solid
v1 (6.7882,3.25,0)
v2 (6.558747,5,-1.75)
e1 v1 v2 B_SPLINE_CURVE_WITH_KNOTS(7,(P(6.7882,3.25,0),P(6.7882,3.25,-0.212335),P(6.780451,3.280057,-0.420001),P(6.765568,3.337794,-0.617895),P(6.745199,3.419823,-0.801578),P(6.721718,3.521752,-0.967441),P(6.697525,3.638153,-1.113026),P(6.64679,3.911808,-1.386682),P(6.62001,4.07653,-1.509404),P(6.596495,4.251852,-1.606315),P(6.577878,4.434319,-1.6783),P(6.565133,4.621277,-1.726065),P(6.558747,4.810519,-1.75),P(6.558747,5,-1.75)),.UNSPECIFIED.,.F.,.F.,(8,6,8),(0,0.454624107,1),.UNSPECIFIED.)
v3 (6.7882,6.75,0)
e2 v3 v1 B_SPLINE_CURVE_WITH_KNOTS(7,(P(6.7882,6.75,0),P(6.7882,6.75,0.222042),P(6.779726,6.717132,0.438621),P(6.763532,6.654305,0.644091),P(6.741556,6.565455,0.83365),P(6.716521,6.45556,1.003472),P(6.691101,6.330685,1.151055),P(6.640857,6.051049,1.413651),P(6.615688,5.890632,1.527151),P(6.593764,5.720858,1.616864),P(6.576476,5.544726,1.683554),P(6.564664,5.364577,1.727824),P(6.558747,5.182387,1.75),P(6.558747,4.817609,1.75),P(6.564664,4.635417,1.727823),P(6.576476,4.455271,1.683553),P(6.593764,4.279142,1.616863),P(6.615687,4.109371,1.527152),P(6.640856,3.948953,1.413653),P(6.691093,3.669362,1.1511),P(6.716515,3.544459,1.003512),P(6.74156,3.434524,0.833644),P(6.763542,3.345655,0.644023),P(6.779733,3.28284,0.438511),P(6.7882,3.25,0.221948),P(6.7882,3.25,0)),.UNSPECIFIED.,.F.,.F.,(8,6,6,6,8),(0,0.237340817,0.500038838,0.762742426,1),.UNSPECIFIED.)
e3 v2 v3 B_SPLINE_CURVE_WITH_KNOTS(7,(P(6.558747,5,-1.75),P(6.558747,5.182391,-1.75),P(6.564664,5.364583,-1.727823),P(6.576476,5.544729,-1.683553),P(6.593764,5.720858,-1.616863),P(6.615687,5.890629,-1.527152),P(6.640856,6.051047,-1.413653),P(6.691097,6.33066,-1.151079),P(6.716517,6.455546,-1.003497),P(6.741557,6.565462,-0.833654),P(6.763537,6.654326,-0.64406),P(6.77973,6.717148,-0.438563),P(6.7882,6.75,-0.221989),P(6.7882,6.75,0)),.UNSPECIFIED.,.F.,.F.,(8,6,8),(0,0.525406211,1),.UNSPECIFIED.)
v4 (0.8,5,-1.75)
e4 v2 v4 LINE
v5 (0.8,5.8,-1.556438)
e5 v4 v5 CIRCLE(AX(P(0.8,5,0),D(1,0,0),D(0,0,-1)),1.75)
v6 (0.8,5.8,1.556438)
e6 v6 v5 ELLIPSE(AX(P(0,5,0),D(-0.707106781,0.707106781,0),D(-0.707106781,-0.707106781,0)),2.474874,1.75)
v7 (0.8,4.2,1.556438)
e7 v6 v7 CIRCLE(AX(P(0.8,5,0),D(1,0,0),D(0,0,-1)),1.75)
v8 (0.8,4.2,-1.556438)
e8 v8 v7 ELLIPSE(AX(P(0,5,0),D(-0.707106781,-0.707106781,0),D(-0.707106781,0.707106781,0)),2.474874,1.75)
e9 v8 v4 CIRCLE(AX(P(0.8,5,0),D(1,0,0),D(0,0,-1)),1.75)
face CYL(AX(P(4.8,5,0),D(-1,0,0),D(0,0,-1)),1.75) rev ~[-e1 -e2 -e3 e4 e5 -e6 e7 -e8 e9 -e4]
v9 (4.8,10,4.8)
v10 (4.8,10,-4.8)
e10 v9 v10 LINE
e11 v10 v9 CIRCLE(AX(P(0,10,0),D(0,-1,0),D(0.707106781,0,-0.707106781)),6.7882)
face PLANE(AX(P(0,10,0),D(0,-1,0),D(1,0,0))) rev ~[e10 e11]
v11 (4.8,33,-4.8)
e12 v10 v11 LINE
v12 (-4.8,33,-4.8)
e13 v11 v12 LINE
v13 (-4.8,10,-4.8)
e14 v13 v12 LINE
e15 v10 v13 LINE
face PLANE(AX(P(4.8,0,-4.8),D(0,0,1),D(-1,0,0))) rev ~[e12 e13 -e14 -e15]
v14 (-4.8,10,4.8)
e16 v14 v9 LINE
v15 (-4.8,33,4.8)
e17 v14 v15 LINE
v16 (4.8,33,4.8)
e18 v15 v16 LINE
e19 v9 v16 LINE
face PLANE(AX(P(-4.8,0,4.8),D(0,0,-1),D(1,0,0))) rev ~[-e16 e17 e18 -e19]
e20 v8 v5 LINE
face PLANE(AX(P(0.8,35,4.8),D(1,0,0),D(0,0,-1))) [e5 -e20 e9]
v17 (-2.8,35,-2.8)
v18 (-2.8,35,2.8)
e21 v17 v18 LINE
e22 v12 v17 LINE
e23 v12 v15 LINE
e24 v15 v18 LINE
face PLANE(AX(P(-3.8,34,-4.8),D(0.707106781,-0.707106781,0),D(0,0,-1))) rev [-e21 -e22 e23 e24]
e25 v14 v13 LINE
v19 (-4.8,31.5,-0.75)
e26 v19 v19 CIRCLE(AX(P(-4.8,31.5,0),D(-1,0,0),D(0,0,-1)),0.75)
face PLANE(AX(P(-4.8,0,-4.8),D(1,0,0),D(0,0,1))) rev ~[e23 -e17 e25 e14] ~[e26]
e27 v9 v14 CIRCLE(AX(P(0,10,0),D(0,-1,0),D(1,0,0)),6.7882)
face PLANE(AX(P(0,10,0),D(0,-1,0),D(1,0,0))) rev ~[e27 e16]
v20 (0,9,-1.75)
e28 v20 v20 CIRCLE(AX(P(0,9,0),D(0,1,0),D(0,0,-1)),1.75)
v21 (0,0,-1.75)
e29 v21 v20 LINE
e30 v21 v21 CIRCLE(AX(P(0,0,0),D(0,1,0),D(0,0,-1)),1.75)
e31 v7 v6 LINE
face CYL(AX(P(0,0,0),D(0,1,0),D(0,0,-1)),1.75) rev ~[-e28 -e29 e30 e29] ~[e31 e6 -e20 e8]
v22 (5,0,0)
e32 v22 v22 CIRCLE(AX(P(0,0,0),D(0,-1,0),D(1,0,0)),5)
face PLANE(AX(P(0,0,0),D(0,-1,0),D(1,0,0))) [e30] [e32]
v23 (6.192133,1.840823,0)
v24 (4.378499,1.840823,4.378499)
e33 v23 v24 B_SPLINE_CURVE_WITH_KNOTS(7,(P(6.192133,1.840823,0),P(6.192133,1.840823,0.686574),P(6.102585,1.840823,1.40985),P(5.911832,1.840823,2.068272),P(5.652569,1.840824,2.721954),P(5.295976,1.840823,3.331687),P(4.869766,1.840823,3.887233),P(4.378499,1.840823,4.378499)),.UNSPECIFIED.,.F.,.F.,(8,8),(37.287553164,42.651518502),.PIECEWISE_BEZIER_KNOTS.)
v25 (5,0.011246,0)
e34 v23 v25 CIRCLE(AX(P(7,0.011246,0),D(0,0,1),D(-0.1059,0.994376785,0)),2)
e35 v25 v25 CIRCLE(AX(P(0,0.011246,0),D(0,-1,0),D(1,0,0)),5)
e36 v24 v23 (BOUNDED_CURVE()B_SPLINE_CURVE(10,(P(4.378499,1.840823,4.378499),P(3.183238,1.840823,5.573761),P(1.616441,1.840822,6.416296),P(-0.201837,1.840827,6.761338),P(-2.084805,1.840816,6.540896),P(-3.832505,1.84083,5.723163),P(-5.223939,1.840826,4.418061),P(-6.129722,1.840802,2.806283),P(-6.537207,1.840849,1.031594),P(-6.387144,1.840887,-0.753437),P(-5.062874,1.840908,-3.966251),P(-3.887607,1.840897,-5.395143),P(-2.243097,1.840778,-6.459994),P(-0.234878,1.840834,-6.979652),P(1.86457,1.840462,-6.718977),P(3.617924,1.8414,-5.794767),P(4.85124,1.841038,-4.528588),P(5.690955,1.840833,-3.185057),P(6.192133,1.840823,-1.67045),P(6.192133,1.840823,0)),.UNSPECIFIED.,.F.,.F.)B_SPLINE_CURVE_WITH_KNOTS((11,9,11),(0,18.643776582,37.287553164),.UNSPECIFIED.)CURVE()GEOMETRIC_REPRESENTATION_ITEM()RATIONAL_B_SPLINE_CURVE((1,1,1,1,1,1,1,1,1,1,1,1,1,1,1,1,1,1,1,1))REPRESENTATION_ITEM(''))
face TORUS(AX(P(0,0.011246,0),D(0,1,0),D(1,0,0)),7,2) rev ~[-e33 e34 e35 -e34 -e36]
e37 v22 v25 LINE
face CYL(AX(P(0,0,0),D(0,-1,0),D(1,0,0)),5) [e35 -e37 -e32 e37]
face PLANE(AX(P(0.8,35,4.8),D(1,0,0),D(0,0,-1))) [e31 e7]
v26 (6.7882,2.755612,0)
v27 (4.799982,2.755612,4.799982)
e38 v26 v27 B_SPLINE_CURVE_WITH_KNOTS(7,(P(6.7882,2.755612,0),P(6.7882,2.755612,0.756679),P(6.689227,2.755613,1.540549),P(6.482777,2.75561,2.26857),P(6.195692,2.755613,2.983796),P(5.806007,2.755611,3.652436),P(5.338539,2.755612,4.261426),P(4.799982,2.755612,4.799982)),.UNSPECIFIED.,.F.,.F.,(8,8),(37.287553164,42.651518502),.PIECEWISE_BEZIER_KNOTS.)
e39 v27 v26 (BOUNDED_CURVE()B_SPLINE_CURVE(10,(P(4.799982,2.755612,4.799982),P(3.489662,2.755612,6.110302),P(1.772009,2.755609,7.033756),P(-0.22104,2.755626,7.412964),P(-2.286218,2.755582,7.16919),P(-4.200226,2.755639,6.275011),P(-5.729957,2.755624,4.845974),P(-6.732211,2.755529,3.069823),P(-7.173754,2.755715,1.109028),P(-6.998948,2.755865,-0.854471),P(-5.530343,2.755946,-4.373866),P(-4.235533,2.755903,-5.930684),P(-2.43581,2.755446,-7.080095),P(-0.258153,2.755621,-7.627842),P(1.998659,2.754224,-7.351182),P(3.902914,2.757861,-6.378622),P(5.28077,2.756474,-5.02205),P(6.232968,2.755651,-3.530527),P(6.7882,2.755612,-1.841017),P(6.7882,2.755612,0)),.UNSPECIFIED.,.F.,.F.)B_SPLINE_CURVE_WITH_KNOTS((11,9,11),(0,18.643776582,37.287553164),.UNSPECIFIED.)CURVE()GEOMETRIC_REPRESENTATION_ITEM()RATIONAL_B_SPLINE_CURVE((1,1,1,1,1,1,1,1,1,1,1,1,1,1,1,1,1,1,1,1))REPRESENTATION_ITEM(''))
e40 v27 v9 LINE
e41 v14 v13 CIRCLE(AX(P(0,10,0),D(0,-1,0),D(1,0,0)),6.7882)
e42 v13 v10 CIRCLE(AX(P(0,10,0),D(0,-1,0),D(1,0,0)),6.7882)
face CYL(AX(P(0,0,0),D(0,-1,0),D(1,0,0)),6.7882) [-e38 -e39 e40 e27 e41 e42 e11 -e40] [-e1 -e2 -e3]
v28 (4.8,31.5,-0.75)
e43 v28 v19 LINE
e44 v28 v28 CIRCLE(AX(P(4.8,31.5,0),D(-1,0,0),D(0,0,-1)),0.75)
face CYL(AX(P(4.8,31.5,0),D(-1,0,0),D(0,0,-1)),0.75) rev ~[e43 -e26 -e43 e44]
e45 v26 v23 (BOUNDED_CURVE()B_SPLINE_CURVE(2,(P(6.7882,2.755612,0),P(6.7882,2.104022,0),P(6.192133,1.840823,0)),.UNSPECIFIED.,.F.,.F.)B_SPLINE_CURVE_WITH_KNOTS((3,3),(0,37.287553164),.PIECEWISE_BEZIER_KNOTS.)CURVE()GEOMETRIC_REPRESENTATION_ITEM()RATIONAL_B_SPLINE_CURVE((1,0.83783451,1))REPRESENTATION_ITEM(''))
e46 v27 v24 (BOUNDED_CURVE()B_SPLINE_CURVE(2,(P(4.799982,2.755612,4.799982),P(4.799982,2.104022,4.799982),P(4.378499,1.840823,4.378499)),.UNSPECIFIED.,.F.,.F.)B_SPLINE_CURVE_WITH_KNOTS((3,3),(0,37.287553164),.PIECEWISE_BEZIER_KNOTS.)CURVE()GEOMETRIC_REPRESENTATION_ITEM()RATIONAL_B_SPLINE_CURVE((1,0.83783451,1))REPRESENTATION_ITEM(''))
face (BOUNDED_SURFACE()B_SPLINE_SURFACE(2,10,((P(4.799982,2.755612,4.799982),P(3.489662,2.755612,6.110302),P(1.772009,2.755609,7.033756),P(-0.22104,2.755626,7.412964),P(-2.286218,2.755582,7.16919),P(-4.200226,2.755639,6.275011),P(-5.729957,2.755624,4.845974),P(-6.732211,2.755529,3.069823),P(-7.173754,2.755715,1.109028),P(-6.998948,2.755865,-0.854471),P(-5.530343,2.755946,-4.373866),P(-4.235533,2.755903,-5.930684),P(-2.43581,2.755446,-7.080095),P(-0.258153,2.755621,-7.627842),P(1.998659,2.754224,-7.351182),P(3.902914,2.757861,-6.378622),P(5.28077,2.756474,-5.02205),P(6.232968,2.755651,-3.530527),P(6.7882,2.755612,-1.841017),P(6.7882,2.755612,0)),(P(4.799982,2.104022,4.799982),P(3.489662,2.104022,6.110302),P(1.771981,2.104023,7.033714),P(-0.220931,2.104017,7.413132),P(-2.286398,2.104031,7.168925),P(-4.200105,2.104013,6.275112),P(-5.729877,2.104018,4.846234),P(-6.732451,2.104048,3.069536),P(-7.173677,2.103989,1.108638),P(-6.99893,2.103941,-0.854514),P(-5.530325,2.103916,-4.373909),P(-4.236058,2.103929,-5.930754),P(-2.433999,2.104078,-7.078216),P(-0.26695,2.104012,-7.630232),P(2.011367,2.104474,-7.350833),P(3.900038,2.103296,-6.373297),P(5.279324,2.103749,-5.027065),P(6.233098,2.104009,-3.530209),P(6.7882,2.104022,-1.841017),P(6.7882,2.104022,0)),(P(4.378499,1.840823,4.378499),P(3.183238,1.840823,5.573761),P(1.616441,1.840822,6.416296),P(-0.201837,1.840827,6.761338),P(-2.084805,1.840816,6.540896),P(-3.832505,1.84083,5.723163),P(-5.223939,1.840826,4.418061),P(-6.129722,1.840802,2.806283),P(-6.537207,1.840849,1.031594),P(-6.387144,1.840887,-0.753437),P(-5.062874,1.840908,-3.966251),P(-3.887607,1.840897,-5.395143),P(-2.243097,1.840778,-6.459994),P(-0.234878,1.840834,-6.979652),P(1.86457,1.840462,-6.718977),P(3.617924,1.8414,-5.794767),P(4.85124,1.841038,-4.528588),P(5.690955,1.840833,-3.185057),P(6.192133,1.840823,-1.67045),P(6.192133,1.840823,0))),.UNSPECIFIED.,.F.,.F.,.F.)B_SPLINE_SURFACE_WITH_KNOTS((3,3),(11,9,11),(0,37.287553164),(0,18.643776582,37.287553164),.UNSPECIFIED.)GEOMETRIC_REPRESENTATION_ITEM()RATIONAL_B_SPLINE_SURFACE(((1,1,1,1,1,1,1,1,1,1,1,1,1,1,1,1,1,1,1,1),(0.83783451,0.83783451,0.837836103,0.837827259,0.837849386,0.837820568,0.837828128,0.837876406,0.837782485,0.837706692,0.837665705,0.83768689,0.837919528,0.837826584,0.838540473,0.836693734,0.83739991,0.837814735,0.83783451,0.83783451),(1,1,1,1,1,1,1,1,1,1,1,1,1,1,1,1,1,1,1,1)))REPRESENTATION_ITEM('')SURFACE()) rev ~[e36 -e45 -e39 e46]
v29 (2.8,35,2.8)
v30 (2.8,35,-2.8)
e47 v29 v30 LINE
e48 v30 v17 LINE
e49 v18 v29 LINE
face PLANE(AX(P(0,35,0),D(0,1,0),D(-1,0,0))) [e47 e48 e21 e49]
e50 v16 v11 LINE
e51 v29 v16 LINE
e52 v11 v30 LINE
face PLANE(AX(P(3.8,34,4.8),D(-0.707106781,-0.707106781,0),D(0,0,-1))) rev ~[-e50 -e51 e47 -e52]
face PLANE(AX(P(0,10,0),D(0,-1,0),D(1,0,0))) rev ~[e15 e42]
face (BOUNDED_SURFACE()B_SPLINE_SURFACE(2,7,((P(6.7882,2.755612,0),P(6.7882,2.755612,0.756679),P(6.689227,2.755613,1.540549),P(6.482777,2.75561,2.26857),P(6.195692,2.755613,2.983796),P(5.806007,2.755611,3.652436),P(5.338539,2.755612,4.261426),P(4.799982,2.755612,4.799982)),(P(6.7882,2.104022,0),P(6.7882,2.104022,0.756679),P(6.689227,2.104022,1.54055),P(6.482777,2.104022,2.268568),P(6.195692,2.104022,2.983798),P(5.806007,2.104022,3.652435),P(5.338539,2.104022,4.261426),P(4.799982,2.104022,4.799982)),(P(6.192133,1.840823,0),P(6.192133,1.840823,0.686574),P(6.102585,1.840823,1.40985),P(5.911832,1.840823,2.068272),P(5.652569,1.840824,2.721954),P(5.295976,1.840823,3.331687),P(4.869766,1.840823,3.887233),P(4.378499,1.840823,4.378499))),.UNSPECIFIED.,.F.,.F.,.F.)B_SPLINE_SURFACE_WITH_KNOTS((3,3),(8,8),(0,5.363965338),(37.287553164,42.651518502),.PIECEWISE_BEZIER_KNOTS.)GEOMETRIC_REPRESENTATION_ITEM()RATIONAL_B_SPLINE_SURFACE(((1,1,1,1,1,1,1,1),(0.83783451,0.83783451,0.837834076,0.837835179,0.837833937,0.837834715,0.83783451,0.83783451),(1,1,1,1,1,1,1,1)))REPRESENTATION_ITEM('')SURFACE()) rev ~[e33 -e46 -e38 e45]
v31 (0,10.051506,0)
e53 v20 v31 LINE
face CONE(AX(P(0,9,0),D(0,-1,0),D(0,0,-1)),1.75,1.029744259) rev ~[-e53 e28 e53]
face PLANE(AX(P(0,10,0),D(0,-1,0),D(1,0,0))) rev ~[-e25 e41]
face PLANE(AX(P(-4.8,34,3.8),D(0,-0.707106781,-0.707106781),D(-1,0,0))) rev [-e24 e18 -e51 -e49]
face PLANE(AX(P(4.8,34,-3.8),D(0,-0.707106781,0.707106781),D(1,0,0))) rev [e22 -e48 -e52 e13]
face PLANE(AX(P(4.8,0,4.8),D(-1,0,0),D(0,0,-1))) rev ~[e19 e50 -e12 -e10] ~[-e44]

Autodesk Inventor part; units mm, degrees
ref_plane "YZ Plane" through (0, 0, 0) normal (1, 0, 0) x (0, 1, 0)
ref_plane "XZ Plane" through (0, 0, 0) normal (0, 1, 0) x (-1, 0, 0)
ref_plane "XY Plane" through (0, 0, 0) normal (0, 0, 1) x (1, 0, 0)
sketch "Sketch1" plane through (0, 0, 0) normal (0, 1, 0) x (-1, 0, 0)
  line L0 (4.8, 4.8) -> (-4.8, 4.8)
  line L1 (-4.8, 4.8) -> (-4.8, -4.8)
  line L2 (-4.8, -4.8) -> (4.8, -4.8)
  line L3 (4.8, -4.8) -> (4.8, 4.8)
  point P0 (0, 0)
  point P1 (4.8, 0)
  point P2 (0, -4.8)
  dimension "d0" = 9.6
  dimension "d1" = 9.6
extrude "Extrusion1" add sketch "Sketch1" along normal blind 35
sketch "Sketch5" plane through (0, 0, 0) normal (0, -1, 0) x (1, 0, 0)
  circle A0 centre (0, 0) radius 1.75
  line L0 (4.8, 4.8) -> (4.8, -4.8) projected
  line L1 (-4.8, 4.8) -> (4.8, 4.8) projected
  line L2 (4.8, -4.8) -> (-4.8, -4.8) projected
  line L3 (4.8, 4.8) -> (-4.8, 4.8)
  line L4 (-4.8, 4.8) -> (-4.8, -4.8)
  line L5 (-4.8, -4.8) -> (4.8, -4.8)
  line L6 (4.8, -4.8) -> (4.8, 4.8)
  circle A1 centre (0, 0) radius 6.7882
  point P0 (-4.8, 4.8)
  point P1 (-4.8, 4.8)
  point P2 (-4.8, 4.8)
  dimension "d14" = 3.5
extrude "Extrusion5" add sketch "Sketch5" against normal blind 10 contours A1 L0 | L1 A1 | A1 L2 | L4 A1
sketch "Sketch6" plane through (4.8, 35, 4.8) normal (1, 0, 0) x (0, 0, -1)
  line L0 (0, 0) -> (9.6, 0) projected
  point P0 (4.8, -35)
  point P1 (4.8, -3.5)
  point P2 (4.8, 0)
  dimension "d18" = 3.5
hole "Hole1" at (4.8, 31.5, 0) direction (-1, 0, 0) diameter 1.5 end through all
sketch "Sketch9" plane through (4.8, 35, 4.8) normal (1, 0, 0) x (0, 0, -1)
  circle A0 centre (4.8, -30) radius 1.75
  point P0 (4.8, -35)
  dimension "d41" = 5
  dimension "d42" = 3.5
extrude "Extrusion7" cut sketch "Sketch9" along normal blind 5 and the other way blind 4
sketch "Sketch10" plane through (0, 0, 0) normal (0, -1, 0) x (1, 0, 0)
  point P0 (0, 0)
  point P1 (0, 0)
hole "Hole3" at (0, 0, 0) direction (0, 1, 0) diameter 3.5 depth 9 tip angle 118
sketch "Sketch11" plane through (0, 0, 0) normal (0, -1, 0) x (1, 0, 0)
  circle A0 centre (0, 0) radius 5
  circle A1 centre (0, 0) radius 7.5
  dimension "d55" = 10
  dimension "d63" = 15
extrude "Extrusion8" cut sketch "Sketch11" against normal blind 2
fillet "Fillet3" radius 2 1 edges at (-5, 2, 0)
chamfer "Chamfer1" distance 2 angle 45 4 edges at (-4.8, 35, 0) (0, 35, -4.8) (4.8, 35, 0) (0, 35, 4.8)
fillet "Fillet5" radius 1 2 edges at (6.2715, 2, -2.5977) (-6.2715, 2, 2.5977)
properties part number "wheel-lockV2"
